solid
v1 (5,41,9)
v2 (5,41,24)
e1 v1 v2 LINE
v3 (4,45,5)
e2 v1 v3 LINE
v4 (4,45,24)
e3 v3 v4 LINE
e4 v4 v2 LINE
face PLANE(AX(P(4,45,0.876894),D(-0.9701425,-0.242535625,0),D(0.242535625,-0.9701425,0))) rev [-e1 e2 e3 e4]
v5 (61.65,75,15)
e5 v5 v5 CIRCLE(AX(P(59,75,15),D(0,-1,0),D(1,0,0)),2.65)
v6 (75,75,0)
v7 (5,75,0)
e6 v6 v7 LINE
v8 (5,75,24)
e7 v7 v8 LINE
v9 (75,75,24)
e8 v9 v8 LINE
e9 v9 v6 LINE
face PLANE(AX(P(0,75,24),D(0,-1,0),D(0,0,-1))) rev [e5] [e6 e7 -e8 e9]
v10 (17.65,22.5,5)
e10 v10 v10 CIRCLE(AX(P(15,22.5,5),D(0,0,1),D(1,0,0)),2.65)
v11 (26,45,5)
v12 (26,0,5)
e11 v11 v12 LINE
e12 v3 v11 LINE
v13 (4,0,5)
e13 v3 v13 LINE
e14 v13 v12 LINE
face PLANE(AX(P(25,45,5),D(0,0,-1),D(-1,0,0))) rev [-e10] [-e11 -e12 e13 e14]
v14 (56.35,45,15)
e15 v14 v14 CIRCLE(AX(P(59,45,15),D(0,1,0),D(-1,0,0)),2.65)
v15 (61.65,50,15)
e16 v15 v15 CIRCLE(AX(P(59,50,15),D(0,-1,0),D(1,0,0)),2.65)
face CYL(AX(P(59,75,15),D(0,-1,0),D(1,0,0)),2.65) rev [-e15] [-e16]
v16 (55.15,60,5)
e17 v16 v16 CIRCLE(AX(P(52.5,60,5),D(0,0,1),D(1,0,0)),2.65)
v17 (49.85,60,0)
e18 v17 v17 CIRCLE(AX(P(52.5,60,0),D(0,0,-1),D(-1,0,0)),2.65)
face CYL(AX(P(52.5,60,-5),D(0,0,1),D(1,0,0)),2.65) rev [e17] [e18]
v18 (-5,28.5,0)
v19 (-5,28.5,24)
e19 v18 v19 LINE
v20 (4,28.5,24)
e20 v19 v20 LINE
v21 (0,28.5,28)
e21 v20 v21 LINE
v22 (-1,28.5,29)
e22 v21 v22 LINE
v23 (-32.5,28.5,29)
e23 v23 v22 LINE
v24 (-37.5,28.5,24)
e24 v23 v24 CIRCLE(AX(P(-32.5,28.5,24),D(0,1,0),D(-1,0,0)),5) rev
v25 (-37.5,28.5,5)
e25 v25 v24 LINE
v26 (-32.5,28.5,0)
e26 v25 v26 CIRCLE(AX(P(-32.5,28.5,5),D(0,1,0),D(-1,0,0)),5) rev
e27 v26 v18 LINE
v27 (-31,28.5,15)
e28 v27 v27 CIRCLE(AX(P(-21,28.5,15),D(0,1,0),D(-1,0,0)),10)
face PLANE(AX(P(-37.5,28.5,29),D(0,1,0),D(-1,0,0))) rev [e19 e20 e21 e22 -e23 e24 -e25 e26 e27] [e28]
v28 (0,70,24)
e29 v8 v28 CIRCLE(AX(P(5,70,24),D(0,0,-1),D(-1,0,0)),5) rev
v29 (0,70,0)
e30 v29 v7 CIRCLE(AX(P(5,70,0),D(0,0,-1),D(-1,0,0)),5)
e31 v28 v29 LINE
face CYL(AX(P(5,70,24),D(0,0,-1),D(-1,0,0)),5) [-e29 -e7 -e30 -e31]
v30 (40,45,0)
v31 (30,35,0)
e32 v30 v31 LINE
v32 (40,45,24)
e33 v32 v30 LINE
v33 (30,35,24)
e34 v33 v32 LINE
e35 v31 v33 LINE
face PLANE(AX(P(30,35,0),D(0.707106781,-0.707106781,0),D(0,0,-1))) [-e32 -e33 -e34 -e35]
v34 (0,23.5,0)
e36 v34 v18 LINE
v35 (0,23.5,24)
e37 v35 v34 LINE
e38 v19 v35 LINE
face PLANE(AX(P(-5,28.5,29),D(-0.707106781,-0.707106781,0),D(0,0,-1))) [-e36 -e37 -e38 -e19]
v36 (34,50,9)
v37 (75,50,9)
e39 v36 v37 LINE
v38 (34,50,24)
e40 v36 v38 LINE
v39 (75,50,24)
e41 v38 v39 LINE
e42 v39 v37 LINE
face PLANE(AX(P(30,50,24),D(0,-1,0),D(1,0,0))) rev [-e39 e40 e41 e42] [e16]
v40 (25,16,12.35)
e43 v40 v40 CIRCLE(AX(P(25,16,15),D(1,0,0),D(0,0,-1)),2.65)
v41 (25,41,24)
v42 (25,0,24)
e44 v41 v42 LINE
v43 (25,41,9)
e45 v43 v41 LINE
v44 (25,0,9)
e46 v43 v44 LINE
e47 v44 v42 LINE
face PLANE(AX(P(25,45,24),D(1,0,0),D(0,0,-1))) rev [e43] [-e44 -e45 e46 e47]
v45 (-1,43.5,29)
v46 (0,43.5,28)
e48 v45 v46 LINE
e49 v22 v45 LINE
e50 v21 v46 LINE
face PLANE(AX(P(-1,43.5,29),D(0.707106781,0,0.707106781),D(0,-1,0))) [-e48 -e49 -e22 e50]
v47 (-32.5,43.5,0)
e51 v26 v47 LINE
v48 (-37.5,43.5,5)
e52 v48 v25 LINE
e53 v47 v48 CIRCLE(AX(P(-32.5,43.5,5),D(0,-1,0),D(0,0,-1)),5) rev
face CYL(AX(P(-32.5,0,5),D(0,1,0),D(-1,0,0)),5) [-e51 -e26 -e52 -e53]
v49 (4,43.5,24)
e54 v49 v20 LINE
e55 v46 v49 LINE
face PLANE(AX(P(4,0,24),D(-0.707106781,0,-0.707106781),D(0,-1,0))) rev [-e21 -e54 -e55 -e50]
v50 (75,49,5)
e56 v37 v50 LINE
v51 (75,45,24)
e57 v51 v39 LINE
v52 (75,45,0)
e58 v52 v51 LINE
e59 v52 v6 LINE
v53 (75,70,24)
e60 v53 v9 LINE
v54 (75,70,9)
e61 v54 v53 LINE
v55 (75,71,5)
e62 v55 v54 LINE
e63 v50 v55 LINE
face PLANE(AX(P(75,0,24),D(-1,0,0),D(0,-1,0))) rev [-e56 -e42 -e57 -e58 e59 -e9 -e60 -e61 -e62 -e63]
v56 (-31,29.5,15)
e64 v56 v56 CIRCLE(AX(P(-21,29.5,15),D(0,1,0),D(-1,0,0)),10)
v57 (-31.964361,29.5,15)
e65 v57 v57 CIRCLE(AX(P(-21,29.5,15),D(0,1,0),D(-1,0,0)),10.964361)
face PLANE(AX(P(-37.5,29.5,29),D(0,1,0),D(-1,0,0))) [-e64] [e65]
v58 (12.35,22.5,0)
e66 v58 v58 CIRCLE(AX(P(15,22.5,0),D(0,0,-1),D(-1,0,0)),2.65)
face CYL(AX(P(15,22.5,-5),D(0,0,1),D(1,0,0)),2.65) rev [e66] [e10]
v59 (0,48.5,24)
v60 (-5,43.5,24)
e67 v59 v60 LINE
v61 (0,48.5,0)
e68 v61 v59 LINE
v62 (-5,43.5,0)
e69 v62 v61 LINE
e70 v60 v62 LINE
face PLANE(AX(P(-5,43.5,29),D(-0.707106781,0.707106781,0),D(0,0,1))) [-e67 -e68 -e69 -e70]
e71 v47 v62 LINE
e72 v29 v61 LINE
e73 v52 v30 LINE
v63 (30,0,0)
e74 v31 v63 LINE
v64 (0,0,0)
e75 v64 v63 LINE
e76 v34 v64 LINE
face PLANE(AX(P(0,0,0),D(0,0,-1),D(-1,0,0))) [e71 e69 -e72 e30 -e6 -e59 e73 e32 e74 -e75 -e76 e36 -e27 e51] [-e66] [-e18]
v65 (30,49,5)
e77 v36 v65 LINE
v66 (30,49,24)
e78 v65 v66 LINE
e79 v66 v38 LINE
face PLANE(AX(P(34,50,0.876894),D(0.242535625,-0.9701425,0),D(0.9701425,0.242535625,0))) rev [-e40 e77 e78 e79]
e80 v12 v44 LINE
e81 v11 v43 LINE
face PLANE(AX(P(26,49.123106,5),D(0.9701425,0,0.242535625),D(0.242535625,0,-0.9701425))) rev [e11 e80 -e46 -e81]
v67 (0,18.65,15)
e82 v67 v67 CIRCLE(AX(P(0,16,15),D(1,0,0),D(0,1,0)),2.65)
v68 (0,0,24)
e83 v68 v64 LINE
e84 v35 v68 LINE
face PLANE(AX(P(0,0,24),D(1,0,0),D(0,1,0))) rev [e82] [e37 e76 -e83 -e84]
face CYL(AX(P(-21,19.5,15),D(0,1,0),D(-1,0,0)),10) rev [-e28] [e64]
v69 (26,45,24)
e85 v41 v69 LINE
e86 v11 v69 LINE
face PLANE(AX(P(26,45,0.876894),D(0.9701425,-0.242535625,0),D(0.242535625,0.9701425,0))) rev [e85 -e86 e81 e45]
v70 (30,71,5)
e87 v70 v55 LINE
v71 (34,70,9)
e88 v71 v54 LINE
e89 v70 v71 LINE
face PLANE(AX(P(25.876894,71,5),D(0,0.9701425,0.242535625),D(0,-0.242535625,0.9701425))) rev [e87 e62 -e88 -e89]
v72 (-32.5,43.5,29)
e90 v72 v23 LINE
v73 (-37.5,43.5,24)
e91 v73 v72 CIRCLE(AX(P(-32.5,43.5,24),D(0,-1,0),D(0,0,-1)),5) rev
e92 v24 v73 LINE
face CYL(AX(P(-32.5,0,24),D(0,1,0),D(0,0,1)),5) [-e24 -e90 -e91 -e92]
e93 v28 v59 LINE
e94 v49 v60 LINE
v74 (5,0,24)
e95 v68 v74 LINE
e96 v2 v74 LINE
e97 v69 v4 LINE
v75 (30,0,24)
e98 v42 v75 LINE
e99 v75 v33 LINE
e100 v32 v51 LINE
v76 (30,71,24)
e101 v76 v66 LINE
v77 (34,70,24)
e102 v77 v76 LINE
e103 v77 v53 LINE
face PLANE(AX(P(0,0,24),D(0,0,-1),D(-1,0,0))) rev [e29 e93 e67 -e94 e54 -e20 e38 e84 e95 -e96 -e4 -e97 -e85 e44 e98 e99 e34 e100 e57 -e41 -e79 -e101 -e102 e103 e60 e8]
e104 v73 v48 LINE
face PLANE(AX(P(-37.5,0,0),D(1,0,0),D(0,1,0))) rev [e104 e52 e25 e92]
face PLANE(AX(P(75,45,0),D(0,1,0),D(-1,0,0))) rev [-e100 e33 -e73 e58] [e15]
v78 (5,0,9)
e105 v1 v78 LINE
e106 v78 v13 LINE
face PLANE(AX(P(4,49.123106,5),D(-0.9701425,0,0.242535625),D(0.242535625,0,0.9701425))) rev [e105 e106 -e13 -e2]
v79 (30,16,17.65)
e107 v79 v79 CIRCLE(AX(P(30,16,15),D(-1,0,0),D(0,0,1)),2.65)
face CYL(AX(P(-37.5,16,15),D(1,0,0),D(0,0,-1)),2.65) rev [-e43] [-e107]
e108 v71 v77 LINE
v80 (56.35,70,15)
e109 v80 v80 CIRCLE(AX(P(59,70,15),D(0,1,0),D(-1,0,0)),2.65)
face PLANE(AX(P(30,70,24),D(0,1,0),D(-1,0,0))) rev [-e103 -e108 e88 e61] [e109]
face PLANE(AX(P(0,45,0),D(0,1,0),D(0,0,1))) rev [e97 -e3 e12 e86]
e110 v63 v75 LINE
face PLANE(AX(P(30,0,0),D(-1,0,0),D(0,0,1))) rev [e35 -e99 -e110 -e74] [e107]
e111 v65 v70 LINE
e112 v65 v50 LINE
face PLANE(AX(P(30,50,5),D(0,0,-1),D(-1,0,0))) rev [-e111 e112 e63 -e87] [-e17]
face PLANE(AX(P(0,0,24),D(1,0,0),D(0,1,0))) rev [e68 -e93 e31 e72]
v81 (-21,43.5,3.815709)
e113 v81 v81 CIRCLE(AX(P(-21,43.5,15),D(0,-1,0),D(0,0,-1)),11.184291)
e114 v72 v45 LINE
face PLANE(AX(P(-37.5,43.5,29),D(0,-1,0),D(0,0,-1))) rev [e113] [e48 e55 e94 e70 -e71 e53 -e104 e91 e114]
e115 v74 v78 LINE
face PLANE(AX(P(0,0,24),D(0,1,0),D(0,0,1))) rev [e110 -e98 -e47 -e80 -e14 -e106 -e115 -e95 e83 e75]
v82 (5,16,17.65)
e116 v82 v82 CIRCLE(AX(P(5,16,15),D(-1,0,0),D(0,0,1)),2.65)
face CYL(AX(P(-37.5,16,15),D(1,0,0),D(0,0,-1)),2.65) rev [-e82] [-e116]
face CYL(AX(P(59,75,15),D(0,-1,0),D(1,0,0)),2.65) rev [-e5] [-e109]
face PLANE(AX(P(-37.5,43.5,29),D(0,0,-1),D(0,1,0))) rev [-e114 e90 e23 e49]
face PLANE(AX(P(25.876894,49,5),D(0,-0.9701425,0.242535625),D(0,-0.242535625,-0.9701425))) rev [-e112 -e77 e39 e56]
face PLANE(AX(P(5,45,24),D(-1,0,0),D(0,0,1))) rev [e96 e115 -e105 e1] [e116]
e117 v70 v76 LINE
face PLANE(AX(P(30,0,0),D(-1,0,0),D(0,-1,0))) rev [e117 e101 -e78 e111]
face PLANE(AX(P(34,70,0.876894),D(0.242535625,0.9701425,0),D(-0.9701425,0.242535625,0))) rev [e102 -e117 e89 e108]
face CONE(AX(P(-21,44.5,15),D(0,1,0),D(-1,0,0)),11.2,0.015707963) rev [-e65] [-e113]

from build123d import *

# Parameters (mm, degrees)
SKETCH1_W               = 75
SKETCH1_H               = 75
BOSS_EXTRUDE1_DEPTH     = 24
SKETCH2_W               = 20
SKETCH2_H               = 19
CUT_EXTRUDE1_DEPTH      = 45
SKETCH3_W               = 19
SKETCH3_H               = 20
CUT_EXTRUDE2_DEPTH      = 45
CUT_EXTRUDE3_DEPTH      = 109.747413762
CUT_EXTRUDE3_DEPTH_BACK = 109.747413762
SKETCH4_W               = 45
SKETCH4_H               = 45
FILLET1_R               = 5
CHAMFER1_SIZE           = 10
SKETCH5_W               = 29
SKETCH5_H               = 15
BOSS_EXTRUDE2_DEPTH     = 37.5
SKETCH6_R               = 11.2
CUT_EXTRUDE4_DEPTH      = 14
FILLET2_R               = 5
CHAMFER3_SIZE           = 5
CUT_EXTRUDE5_DEPTH      = 93.146622293
CUT_EXTRUDE5_DEPTH_BACK = 93.146622293
SKETCH7_R               = 2.65
CUT_EXTRUDE6_DEPTH      = 105.986903945
CUT_EXTRUDE6_DEPTH_BACK = 105.986903945
SKETCH8_R               = 2.65
SKETCH9_R               = 2.65
CUT_EXTRUDE7_DEPTH      = 10
SKETCH10_R              = 2.65
CUT_EXTRUDE8_DEPTH      = 10
CUT_EXTRUDE12_DEPTH     = 19
CUT_EXTRUDE13_REACH     = 111.959
CUT_EXTRUDE14_REACH     = 140.283
SKETCH14_R              = 10
CUT_EXTRUDE15_DEPTH     = 10
CHAMFER5_SIZE           = 4
CHAMFER6_SIZE           = 1
CHAMFER8_SIZE           = 15
CHAMFER8_SIZE_2         = 0.23563883


# Some blends are built 0.0001 mm under size
with BuildPart() as part:
    # Sketch1 → Boss-Extrude1 (new body)
    with BuildSketch(Plane.XY):
        with Locations((37.5, 37.5)):
            Rectangle(SKETCH1_W, SKETCH1_H)
    extrude(amount=BOSS_EXTRUDE1_DEPTH)

    # Sketch2 → Cut-Extrude1 (cut)
    with BuildSketch(Plane.XZ):
        with Locations((15, 14.5)):
            Rectangle(SKETCH2_W, SKETCH2_H)
    extrude(amount=-CUT_EXTRUDE1_DEPTH, mode=Mode.SUBTRACT)

    # Sketch3 → Cut-Extrude2 (cut)
    with BuildSketch(Plane(origin=(75, 0, 0), x_dir=(0, 0, -1), z_dir=(1, 0, 0))):
        with Locations((-14.5, 60)):
            Rectangle(SKETCH3_W, SKETCH3_H)
    extrude(amount=-CUT_EXTRUDE2_DEPTH, mode=Mode.SUBTRACT)

    # Sketch4 → Cut-Extrude3 (cut, two sides: drawn at the far end of the back side and taken through both)
    with BuildSketch(Plane.XY.offset(24).offset(-CUT_EXTRUDE3_DEPTH_BACK)):
        with Locations((52.5, 22.5)):
            Rectangle(SKETCH4_W, SKETCH4_H)
    extrude(amount=CUT_EXTRUDE3_DEPTH + CUT_EXTRUDE3_DEPTH_BACK, mode=Mode.SUBTRACT)

    # Fillet1
    fillet1_edges = [part.edges().sort_by_distance(p)[0] for p in [
        (0, 75, 12),
    ]]
    fillet(fillet1_edges, radius=FILLET1_R)

    # Chamfer1
    chamfer1_edges = [part.edges().sort_by_distance(p)[0] for p in [
        (30, 45, 12),
    ]]
    chamfer(chamfer1_edges, length=CHAMFER1_SIZE)

    # Sketch5 → Boss-Extrude2 (add)
    with BuildSketch(Plane.ZY):
        with Locations((14.5, 36)):
            Rectangle(SKETCH5_W, SKETCH5_H)
    extrude(amount=BOSS_EXTRUDE2_DEPTH)

    # Sketch6 → Cut-Extrude4 (cut)
    with BuildSketch(Plane(origin=(0, 43.5, 0), x_dir=(1, 0, 0), z_dir=(0, 1, 0))):
        with Locations(Location((-21, -15.000000001, 0), (0, 0, 180))):
            Circle(SKETCH6_R)
    extrude(amount=-CUT_EXTRUDE4_DEPTH, mode=Mode.SUBTRACT)

    # Fillet2
    fillet2_edges = [part.edges().sort_by_distance(p)[0] for p in [
        (-37.5, 36, 29),
        (-37.5, 36, 0),
    ]]
    fillet(fillet2_edges, radius=FILLET2_R)

    # Chamfer3
    chamfer3_edges = [part.edges().sort_by_distance(p)[0] for p in [
        (0, 43.5, 12),
        (0, 28.5, 12),
    ]]
    chamfer(chamfer3_edges, length=CHAMFER3_SIZE)

    # Sketch7 → Cut-Extrude5 (cut, two sides: drawn at the far end of the back side and taken through both)
    with BuildSketch(Plane.XZ.offset(-45).offset(-CUT_EXTRUDE5_DEPTH_BACK)):
        with Locations((59, 15)):
            Circle(SKETCH7_R)
    extrude(amount=CUT_EXTRUDE5_DEPTH + CUT_EXTRUDE5_DEPTH_BACK, mode=Mode.SUBTRACT)

    # Sketch8 → Cut-Extrude6 (cut, two sides: drawn at the far end of the back side and taken through both)
    with BuildSketch(Plane(origin=(30, 0, 0), x_dir=(0, 0, -1), z_dir=(1, 0, 0)).offset(-CUT_EXTRUDE6_DEPTH_BACK)):
        with Locations((-15, 16)):
            Circle(SKETCH8_R)
    extrude(amount=CUT_EXTRUDE6_DEPTH + CUT_EXTRUDE6_DEPTH_BACK, mode=Mode.SUBTRACT)

    # Sketch9 → Cut-Extrude7 (cut)
    with BuildSketch(Plane.XY.offset(5)):
        with Locations((15, 22.5)):
            Circle(SKETCH9_R)
    extrude(amount=-CUT_EXTRUDE7_DEPTH, mode=Mode.SUBTRACT)

    # Sketch10 → Cut-Extrude8 (cut)
    with BuildSketch(Plane.XY.offset(5)):
        with Locations((52.5, 60)):
            Circle(SKETCH10_R)
    extrude(amount=-CUT_EXTRUDE8_DEPTH, mode=Mode.SUBTRACT)

    # Sketch11 → Cut-Extrude12 (cut)
    with BuildSketch(Plane.XY.offset(24)):
        Polygon((34, 70), (30, 71), (30, 70), align=None)
        Polygon((30, 50), (34, 50), (30, 49), align=None)
        Polygon((26, 45), (25, 41), (25, 45), align=None)
        Polygon((5, 45), (4, 45), (5, 41), align=None)
    extrude(amount=-CUT_EXTRUDE12_DEPTH, mode=Mode.SUBTRACT)

    # Cut-Extrude13: up to this face of the body (flat: up to its plane)
    cut_extrude13_end = Plane(part.part.faces().sort_by_distance((15, 45, 14.5))[0])
    # Sketch12 → Cut-Extrude13 (cut, up to the picked face)
    with BuildSketch(Plane.XZ, mode=Mode.PRIVATE) as cut_extrude13_sk1:
        Polygon((5, 5), (4, 5), (5, 9), align=None)
    cut_extrude13_tool1 = split(extrude(cut_extrude13_sk1.sketch, amount=-CUT_EXTRUDE13_REACH, mode=Mode.PRIVATE), bisect_by=cut_extrude13_end, keep=Keep.BOTH, mode=Mode.PRIVATE)
    # Sketch12 → Cut-Extrude13 (cut, up to the picked face)
    with BuildSketch(Plane.XZ, mode=Mode.PRIVATE) as cut_extrude13_sk2:
        Polygon((25, 5), (26, 5), (25, 9), align=None)
    cut_extrude13_tool2 = split(extrude(cut_extrude13_sk2.sketch, amount=-CUT_EXTRUDE13_REACH, mode=Mode.PRIVATE), bisect_by=cut_extrude13_end, keep=Keep.BOTH, mode=Mode.PRIVATE)
    add(cut_extrude13_tool1.solids().sort_by(Axis((4.666667, 0, 6.333333), (0, 1, 0)))[0], mode=Mode.SUBTRACT)
    add(cut_extrude13_tool2.solids().sort_by(Axis((25.333333, 0, 6.333333), (0, 1, 0)))[0], mode=Mode.SUBTRACT)

    # Cut-Extrude14: up to this face of the body (flat: up to its plane)
    cut_extrude14_end = Plane(part.part.faces().sort_by_distance((30, 60, 14.5))[0])
    # Sketch13 → Cut-Extrude14 (cut, up to the picked face)
    with BuildSketch(Plane(origin=(75, 0, 0), x_dir=(0, 0, -1), z_dir=(1, 0, 0)), mode=Mode.PRIVATE) as cut_extrude14_sk1:
        Polygon((-5, 50), (-5, 49), (-9, 50), align=None)
    cut_extrude14_tool1 = split(extrude(cut_extrude14_sk1.sketch, amount=-CUT_EXTRUDE14_REACH, mode=Mode.PRIVATE), bisect_by=cut_extrude14_end, keep=Keep.BOTH, mode=Mode.PRIVATE)
    # Sketch13 → Cut-Extrude14 (cut, up to the picked face)
    with BuildSketch(Plane(origin=(75, 0, 0), x_dir=(0, 0, -1), z_dir=(1, 0, 0)), mode=Mode.PRIVATE) as cut_extrude14_sk2:
        Polygon((-5, 70), (-5, 71), (-9, 70), align=None)
    cut_extrude14_tool2 = split(extrude(cut_extrude14_sk2.sketch, amount=-CUT_EXTRUDE14_REACH, mode=Mode.PRIVATE), bisect_by=cut_extrude14_end, keep=Keep.BOTH, mode=Mode.PRIVATE)
    add(cut_extrude14_tool1.solids().sort_by(Axis((75, 49.666667, 6.333333), (-1, 0, 0)))[0], mode=Mode.SUBTRACT)
    add(cut_extrude14_tool2.solids().sort_by(Axis((75, 70.333333, 6.333333), (-1, 0, 0)))[0], mode=Mode.SUBTRACT)

    # Sketch14 → Cut-Extrude15 (cut)
    with BuildSketch(Plane(origin=(0, 29.5, 0), x_dir=(1, 0, 0), z_dir=(0, 1, 0))):
        with Locations(Location((-21, -15.000000001, 0), (0, 0, 180))):
            Circle(SKETCH14_R)
    extrude(amount=-CUT_EXTRUDE15_DEPTH, mode=Mode.SUBTRACT)

    # Chamfer5
    chamfer5_edges = [part.edges().sort_by_distance(p)[0] for p in [
        (0, 36, 24),
    ]]
    chamfer(chamfer5_edges, length=CHAMFER5_SIZE)

    # Chamfer6
    chamfer6_edges = [part.edges().sort_by_distance(p)[0] for p in [
        (0, 36, 29),
    ]]
    chamfer(chamfer6_edges, length=CHAMFER6_SIZE - 0.0001)  # a hair under: the kernel refuses the full size

    # Chamfer8
    # the kernel refuses this chamfer: 15, 0.23563883 mm, written as the material it adds along each edge
    with BuildSketch(Plane(origin=(-21, 29.5, 15.000000001), x_dir=(-1, 0, 0), z_dir=(0, 0, -1))) as chamfer8_piece_1_section:
        Polygon((11.2, CHAMFER8_SIZE), (11.2 - CHAMFER8_SIZE_2, 0), (11.2, 0), align=None)
    chamfer8_piece_1 = revolve(axis=Axis((-21, 29.5, 15.000000001), (0, 1, 0)), mode=Mode.PRIVATE)
    chamfer8_piece_1 = split(chamfer8_piece_1, bisect_by=Plane(origin=(-9.855053723, 43.5, 15.000000001), z_dir=(0, -1, 0)), keep=Keep.TOP, mode=Mode.PRIVATE)
    add(chamfer8_piece_1)


solid = part.part
